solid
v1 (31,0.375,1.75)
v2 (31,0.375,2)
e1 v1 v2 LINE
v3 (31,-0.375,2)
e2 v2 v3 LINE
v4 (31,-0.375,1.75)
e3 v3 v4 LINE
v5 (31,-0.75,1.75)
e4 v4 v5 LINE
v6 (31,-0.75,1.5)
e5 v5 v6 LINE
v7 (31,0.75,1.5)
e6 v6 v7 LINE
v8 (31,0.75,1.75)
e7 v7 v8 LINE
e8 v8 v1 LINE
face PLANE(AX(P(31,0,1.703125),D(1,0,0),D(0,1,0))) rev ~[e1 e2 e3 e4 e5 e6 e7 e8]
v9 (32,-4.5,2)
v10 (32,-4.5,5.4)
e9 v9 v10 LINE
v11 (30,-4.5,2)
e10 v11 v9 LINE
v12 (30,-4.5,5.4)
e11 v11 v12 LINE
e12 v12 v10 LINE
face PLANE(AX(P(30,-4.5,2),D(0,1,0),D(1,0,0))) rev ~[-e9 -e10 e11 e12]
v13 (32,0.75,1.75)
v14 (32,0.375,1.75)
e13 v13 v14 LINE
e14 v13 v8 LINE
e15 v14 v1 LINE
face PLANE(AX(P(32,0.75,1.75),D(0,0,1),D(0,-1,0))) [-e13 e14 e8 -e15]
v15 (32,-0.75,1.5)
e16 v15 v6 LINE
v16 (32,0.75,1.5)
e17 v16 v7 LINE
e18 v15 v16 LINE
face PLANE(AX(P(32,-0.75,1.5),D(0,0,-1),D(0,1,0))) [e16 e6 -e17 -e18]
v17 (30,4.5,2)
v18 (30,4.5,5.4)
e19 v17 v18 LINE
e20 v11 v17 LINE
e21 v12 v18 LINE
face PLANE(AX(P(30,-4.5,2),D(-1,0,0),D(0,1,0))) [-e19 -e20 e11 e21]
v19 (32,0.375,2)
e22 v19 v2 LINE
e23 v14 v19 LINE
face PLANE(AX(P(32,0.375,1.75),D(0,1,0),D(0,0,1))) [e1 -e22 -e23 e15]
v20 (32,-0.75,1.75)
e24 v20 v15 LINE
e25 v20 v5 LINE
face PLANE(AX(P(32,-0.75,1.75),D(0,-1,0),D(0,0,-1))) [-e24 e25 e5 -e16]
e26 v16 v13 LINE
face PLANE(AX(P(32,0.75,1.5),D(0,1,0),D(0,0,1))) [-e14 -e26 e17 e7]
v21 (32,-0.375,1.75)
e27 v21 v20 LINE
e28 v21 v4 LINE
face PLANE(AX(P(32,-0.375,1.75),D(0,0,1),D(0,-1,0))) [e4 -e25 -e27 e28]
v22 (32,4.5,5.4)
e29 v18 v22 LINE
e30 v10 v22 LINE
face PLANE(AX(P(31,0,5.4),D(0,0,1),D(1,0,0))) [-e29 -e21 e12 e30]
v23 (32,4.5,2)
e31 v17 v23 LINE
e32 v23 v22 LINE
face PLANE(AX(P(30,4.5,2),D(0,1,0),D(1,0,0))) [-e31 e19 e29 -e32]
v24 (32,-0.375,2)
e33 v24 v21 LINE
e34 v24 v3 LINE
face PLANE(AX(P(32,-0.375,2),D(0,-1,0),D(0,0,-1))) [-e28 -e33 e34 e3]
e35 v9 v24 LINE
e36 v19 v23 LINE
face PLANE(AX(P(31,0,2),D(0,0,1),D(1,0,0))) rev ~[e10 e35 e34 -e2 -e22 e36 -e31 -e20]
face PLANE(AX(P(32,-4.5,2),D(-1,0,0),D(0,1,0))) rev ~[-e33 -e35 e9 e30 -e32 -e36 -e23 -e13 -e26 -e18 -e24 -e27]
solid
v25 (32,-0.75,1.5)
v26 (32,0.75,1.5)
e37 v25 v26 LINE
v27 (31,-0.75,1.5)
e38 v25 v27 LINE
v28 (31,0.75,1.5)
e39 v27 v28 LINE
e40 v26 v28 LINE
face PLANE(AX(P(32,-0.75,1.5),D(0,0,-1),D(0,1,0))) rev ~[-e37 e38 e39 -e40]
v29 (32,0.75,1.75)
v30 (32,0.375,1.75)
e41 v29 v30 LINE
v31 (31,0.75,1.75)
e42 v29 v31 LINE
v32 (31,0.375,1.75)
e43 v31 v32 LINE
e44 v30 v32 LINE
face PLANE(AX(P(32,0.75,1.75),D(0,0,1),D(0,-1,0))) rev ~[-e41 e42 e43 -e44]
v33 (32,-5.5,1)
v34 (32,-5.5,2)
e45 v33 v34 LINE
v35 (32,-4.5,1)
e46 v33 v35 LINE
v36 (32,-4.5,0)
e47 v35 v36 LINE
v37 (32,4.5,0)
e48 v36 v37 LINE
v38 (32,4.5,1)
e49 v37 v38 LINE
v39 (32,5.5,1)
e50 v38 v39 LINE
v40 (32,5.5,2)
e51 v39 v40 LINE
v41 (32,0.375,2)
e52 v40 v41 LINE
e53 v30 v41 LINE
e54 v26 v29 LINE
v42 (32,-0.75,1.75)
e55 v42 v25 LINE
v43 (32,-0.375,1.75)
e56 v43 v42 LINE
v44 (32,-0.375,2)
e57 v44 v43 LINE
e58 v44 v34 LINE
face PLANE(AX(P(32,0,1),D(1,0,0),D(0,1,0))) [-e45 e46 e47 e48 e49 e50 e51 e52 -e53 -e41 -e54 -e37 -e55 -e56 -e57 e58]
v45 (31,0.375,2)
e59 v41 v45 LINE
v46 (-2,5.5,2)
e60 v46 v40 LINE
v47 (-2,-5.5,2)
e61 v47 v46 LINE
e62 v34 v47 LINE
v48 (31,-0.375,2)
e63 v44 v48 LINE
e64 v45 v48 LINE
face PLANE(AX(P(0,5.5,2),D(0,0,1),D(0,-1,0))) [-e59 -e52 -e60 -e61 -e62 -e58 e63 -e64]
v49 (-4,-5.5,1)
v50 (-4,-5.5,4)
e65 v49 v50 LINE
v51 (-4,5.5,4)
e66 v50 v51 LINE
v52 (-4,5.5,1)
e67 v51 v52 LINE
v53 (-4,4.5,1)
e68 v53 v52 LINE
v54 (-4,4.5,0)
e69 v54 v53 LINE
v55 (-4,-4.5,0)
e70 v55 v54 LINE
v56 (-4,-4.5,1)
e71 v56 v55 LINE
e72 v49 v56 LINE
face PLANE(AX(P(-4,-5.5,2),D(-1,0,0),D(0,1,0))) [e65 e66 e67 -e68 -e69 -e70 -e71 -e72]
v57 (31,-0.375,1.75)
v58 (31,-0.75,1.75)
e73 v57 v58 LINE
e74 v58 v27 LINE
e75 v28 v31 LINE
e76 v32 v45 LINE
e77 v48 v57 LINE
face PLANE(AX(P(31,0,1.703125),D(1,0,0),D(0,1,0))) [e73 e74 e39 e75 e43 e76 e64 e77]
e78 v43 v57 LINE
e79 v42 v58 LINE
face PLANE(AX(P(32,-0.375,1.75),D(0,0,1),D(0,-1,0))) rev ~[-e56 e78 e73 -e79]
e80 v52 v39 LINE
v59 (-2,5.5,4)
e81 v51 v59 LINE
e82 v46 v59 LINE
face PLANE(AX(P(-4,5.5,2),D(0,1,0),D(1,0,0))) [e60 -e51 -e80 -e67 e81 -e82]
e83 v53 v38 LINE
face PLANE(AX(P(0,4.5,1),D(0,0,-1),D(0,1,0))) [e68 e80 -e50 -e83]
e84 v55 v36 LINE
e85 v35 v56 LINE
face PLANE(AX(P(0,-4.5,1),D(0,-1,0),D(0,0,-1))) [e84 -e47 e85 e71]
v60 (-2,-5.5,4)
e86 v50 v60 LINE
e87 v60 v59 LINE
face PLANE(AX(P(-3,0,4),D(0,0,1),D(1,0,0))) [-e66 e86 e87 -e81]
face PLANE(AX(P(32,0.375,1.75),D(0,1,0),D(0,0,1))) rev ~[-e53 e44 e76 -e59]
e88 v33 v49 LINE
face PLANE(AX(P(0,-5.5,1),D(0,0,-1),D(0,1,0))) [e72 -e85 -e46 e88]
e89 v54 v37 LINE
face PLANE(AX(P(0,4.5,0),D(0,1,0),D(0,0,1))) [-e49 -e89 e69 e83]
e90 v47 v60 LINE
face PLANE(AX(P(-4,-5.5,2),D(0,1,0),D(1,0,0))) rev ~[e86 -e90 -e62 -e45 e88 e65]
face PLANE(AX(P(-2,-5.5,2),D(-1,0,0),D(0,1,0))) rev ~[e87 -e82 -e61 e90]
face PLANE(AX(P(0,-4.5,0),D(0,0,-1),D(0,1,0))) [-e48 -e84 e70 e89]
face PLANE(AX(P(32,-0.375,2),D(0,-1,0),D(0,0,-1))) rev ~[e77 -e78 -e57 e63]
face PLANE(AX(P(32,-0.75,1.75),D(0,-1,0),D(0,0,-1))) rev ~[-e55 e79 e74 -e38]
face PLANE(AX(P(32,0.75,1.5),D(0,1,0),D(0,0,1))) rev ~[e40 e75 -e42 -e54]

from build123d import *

# Parameters (mm, degrees)
F0_W          = 1
F0_H          = 1
F1_DEPTH      = 32
F1_DEPTH_BACK = 4
F2_W          = 2
F2_H          = 9
F3_DEPTH      = 3.4
F5_DEPTH      = 1
F6_DEPTH      = 1
F7_W          = 2
F7_H          = 11
F8_DEPTH      = 2


with BuildPart() as f1:
    # F0 (on Right) → F1 (new body, two sides)
    with BuildSketch(Plane.YZ) as f1_sk:
        Polygon((4.5, 1), (4.5, 2), (-4.5, 2), (-4.5, 1), (-4.5, 0), (4.5, 0), align=None)
        with Locations((5, 1.5)):
            Rectangle(F0_W, F0_H)
        with Locations((-5, 1.5)):
            Rectangle(F0_W, F0_H)
    extrude(amount=F1_DEPTH)
    extrude(f1_sk.sketch, amount=-F1_DEPTH_BACK)

    # F4 (on face) → F5 (cut)
    with BuildSketch(Plane.YZ.offset(32)):
        Polygon((0.375, 2), (-0.375, 2), (-0.375, 1.75), (-0.75, 1.75), (-0.75, 1.5), (0.75, 1.5), (0.75, 1.75), (0.375, 1.75), align=None)
    extrude(amount=-F5_DEPTH, mode=Mode.SUBTRACT)

    # F7 (on face) → F8 (join)
    with BuildSketch(Plane.XY.offset(2)):
        with Locations((-3, 0)):
            Rectangle(F7_W, F7_H)
    extrude(amount=F8_DEPTH)


with BuildPart() as f3:
    # F2 (on face) → F3 (new body)
    with BuildSketch(Plane.XY.offset(2)):
        with Locations((31, 0)):
            Rectangle(F2_W, F2_H)
    extrude(amount=F3_DEPTH)

    # F4 (on face) → F6 (join)
    with BuildSketch(Plane.YZ.offset(32)):
        Polygon((0.375, 2), (-0.375, 2), (-0.375, 1.75), (-0.75, 1.75), (-0.75, 1.5), (0.75, 1.5), (0.75, 1.75), (0.375, 1.75), align=None)
    extrude(amount=-F6_DEPTH)


solid = Compound([f1.part, f3.part])
